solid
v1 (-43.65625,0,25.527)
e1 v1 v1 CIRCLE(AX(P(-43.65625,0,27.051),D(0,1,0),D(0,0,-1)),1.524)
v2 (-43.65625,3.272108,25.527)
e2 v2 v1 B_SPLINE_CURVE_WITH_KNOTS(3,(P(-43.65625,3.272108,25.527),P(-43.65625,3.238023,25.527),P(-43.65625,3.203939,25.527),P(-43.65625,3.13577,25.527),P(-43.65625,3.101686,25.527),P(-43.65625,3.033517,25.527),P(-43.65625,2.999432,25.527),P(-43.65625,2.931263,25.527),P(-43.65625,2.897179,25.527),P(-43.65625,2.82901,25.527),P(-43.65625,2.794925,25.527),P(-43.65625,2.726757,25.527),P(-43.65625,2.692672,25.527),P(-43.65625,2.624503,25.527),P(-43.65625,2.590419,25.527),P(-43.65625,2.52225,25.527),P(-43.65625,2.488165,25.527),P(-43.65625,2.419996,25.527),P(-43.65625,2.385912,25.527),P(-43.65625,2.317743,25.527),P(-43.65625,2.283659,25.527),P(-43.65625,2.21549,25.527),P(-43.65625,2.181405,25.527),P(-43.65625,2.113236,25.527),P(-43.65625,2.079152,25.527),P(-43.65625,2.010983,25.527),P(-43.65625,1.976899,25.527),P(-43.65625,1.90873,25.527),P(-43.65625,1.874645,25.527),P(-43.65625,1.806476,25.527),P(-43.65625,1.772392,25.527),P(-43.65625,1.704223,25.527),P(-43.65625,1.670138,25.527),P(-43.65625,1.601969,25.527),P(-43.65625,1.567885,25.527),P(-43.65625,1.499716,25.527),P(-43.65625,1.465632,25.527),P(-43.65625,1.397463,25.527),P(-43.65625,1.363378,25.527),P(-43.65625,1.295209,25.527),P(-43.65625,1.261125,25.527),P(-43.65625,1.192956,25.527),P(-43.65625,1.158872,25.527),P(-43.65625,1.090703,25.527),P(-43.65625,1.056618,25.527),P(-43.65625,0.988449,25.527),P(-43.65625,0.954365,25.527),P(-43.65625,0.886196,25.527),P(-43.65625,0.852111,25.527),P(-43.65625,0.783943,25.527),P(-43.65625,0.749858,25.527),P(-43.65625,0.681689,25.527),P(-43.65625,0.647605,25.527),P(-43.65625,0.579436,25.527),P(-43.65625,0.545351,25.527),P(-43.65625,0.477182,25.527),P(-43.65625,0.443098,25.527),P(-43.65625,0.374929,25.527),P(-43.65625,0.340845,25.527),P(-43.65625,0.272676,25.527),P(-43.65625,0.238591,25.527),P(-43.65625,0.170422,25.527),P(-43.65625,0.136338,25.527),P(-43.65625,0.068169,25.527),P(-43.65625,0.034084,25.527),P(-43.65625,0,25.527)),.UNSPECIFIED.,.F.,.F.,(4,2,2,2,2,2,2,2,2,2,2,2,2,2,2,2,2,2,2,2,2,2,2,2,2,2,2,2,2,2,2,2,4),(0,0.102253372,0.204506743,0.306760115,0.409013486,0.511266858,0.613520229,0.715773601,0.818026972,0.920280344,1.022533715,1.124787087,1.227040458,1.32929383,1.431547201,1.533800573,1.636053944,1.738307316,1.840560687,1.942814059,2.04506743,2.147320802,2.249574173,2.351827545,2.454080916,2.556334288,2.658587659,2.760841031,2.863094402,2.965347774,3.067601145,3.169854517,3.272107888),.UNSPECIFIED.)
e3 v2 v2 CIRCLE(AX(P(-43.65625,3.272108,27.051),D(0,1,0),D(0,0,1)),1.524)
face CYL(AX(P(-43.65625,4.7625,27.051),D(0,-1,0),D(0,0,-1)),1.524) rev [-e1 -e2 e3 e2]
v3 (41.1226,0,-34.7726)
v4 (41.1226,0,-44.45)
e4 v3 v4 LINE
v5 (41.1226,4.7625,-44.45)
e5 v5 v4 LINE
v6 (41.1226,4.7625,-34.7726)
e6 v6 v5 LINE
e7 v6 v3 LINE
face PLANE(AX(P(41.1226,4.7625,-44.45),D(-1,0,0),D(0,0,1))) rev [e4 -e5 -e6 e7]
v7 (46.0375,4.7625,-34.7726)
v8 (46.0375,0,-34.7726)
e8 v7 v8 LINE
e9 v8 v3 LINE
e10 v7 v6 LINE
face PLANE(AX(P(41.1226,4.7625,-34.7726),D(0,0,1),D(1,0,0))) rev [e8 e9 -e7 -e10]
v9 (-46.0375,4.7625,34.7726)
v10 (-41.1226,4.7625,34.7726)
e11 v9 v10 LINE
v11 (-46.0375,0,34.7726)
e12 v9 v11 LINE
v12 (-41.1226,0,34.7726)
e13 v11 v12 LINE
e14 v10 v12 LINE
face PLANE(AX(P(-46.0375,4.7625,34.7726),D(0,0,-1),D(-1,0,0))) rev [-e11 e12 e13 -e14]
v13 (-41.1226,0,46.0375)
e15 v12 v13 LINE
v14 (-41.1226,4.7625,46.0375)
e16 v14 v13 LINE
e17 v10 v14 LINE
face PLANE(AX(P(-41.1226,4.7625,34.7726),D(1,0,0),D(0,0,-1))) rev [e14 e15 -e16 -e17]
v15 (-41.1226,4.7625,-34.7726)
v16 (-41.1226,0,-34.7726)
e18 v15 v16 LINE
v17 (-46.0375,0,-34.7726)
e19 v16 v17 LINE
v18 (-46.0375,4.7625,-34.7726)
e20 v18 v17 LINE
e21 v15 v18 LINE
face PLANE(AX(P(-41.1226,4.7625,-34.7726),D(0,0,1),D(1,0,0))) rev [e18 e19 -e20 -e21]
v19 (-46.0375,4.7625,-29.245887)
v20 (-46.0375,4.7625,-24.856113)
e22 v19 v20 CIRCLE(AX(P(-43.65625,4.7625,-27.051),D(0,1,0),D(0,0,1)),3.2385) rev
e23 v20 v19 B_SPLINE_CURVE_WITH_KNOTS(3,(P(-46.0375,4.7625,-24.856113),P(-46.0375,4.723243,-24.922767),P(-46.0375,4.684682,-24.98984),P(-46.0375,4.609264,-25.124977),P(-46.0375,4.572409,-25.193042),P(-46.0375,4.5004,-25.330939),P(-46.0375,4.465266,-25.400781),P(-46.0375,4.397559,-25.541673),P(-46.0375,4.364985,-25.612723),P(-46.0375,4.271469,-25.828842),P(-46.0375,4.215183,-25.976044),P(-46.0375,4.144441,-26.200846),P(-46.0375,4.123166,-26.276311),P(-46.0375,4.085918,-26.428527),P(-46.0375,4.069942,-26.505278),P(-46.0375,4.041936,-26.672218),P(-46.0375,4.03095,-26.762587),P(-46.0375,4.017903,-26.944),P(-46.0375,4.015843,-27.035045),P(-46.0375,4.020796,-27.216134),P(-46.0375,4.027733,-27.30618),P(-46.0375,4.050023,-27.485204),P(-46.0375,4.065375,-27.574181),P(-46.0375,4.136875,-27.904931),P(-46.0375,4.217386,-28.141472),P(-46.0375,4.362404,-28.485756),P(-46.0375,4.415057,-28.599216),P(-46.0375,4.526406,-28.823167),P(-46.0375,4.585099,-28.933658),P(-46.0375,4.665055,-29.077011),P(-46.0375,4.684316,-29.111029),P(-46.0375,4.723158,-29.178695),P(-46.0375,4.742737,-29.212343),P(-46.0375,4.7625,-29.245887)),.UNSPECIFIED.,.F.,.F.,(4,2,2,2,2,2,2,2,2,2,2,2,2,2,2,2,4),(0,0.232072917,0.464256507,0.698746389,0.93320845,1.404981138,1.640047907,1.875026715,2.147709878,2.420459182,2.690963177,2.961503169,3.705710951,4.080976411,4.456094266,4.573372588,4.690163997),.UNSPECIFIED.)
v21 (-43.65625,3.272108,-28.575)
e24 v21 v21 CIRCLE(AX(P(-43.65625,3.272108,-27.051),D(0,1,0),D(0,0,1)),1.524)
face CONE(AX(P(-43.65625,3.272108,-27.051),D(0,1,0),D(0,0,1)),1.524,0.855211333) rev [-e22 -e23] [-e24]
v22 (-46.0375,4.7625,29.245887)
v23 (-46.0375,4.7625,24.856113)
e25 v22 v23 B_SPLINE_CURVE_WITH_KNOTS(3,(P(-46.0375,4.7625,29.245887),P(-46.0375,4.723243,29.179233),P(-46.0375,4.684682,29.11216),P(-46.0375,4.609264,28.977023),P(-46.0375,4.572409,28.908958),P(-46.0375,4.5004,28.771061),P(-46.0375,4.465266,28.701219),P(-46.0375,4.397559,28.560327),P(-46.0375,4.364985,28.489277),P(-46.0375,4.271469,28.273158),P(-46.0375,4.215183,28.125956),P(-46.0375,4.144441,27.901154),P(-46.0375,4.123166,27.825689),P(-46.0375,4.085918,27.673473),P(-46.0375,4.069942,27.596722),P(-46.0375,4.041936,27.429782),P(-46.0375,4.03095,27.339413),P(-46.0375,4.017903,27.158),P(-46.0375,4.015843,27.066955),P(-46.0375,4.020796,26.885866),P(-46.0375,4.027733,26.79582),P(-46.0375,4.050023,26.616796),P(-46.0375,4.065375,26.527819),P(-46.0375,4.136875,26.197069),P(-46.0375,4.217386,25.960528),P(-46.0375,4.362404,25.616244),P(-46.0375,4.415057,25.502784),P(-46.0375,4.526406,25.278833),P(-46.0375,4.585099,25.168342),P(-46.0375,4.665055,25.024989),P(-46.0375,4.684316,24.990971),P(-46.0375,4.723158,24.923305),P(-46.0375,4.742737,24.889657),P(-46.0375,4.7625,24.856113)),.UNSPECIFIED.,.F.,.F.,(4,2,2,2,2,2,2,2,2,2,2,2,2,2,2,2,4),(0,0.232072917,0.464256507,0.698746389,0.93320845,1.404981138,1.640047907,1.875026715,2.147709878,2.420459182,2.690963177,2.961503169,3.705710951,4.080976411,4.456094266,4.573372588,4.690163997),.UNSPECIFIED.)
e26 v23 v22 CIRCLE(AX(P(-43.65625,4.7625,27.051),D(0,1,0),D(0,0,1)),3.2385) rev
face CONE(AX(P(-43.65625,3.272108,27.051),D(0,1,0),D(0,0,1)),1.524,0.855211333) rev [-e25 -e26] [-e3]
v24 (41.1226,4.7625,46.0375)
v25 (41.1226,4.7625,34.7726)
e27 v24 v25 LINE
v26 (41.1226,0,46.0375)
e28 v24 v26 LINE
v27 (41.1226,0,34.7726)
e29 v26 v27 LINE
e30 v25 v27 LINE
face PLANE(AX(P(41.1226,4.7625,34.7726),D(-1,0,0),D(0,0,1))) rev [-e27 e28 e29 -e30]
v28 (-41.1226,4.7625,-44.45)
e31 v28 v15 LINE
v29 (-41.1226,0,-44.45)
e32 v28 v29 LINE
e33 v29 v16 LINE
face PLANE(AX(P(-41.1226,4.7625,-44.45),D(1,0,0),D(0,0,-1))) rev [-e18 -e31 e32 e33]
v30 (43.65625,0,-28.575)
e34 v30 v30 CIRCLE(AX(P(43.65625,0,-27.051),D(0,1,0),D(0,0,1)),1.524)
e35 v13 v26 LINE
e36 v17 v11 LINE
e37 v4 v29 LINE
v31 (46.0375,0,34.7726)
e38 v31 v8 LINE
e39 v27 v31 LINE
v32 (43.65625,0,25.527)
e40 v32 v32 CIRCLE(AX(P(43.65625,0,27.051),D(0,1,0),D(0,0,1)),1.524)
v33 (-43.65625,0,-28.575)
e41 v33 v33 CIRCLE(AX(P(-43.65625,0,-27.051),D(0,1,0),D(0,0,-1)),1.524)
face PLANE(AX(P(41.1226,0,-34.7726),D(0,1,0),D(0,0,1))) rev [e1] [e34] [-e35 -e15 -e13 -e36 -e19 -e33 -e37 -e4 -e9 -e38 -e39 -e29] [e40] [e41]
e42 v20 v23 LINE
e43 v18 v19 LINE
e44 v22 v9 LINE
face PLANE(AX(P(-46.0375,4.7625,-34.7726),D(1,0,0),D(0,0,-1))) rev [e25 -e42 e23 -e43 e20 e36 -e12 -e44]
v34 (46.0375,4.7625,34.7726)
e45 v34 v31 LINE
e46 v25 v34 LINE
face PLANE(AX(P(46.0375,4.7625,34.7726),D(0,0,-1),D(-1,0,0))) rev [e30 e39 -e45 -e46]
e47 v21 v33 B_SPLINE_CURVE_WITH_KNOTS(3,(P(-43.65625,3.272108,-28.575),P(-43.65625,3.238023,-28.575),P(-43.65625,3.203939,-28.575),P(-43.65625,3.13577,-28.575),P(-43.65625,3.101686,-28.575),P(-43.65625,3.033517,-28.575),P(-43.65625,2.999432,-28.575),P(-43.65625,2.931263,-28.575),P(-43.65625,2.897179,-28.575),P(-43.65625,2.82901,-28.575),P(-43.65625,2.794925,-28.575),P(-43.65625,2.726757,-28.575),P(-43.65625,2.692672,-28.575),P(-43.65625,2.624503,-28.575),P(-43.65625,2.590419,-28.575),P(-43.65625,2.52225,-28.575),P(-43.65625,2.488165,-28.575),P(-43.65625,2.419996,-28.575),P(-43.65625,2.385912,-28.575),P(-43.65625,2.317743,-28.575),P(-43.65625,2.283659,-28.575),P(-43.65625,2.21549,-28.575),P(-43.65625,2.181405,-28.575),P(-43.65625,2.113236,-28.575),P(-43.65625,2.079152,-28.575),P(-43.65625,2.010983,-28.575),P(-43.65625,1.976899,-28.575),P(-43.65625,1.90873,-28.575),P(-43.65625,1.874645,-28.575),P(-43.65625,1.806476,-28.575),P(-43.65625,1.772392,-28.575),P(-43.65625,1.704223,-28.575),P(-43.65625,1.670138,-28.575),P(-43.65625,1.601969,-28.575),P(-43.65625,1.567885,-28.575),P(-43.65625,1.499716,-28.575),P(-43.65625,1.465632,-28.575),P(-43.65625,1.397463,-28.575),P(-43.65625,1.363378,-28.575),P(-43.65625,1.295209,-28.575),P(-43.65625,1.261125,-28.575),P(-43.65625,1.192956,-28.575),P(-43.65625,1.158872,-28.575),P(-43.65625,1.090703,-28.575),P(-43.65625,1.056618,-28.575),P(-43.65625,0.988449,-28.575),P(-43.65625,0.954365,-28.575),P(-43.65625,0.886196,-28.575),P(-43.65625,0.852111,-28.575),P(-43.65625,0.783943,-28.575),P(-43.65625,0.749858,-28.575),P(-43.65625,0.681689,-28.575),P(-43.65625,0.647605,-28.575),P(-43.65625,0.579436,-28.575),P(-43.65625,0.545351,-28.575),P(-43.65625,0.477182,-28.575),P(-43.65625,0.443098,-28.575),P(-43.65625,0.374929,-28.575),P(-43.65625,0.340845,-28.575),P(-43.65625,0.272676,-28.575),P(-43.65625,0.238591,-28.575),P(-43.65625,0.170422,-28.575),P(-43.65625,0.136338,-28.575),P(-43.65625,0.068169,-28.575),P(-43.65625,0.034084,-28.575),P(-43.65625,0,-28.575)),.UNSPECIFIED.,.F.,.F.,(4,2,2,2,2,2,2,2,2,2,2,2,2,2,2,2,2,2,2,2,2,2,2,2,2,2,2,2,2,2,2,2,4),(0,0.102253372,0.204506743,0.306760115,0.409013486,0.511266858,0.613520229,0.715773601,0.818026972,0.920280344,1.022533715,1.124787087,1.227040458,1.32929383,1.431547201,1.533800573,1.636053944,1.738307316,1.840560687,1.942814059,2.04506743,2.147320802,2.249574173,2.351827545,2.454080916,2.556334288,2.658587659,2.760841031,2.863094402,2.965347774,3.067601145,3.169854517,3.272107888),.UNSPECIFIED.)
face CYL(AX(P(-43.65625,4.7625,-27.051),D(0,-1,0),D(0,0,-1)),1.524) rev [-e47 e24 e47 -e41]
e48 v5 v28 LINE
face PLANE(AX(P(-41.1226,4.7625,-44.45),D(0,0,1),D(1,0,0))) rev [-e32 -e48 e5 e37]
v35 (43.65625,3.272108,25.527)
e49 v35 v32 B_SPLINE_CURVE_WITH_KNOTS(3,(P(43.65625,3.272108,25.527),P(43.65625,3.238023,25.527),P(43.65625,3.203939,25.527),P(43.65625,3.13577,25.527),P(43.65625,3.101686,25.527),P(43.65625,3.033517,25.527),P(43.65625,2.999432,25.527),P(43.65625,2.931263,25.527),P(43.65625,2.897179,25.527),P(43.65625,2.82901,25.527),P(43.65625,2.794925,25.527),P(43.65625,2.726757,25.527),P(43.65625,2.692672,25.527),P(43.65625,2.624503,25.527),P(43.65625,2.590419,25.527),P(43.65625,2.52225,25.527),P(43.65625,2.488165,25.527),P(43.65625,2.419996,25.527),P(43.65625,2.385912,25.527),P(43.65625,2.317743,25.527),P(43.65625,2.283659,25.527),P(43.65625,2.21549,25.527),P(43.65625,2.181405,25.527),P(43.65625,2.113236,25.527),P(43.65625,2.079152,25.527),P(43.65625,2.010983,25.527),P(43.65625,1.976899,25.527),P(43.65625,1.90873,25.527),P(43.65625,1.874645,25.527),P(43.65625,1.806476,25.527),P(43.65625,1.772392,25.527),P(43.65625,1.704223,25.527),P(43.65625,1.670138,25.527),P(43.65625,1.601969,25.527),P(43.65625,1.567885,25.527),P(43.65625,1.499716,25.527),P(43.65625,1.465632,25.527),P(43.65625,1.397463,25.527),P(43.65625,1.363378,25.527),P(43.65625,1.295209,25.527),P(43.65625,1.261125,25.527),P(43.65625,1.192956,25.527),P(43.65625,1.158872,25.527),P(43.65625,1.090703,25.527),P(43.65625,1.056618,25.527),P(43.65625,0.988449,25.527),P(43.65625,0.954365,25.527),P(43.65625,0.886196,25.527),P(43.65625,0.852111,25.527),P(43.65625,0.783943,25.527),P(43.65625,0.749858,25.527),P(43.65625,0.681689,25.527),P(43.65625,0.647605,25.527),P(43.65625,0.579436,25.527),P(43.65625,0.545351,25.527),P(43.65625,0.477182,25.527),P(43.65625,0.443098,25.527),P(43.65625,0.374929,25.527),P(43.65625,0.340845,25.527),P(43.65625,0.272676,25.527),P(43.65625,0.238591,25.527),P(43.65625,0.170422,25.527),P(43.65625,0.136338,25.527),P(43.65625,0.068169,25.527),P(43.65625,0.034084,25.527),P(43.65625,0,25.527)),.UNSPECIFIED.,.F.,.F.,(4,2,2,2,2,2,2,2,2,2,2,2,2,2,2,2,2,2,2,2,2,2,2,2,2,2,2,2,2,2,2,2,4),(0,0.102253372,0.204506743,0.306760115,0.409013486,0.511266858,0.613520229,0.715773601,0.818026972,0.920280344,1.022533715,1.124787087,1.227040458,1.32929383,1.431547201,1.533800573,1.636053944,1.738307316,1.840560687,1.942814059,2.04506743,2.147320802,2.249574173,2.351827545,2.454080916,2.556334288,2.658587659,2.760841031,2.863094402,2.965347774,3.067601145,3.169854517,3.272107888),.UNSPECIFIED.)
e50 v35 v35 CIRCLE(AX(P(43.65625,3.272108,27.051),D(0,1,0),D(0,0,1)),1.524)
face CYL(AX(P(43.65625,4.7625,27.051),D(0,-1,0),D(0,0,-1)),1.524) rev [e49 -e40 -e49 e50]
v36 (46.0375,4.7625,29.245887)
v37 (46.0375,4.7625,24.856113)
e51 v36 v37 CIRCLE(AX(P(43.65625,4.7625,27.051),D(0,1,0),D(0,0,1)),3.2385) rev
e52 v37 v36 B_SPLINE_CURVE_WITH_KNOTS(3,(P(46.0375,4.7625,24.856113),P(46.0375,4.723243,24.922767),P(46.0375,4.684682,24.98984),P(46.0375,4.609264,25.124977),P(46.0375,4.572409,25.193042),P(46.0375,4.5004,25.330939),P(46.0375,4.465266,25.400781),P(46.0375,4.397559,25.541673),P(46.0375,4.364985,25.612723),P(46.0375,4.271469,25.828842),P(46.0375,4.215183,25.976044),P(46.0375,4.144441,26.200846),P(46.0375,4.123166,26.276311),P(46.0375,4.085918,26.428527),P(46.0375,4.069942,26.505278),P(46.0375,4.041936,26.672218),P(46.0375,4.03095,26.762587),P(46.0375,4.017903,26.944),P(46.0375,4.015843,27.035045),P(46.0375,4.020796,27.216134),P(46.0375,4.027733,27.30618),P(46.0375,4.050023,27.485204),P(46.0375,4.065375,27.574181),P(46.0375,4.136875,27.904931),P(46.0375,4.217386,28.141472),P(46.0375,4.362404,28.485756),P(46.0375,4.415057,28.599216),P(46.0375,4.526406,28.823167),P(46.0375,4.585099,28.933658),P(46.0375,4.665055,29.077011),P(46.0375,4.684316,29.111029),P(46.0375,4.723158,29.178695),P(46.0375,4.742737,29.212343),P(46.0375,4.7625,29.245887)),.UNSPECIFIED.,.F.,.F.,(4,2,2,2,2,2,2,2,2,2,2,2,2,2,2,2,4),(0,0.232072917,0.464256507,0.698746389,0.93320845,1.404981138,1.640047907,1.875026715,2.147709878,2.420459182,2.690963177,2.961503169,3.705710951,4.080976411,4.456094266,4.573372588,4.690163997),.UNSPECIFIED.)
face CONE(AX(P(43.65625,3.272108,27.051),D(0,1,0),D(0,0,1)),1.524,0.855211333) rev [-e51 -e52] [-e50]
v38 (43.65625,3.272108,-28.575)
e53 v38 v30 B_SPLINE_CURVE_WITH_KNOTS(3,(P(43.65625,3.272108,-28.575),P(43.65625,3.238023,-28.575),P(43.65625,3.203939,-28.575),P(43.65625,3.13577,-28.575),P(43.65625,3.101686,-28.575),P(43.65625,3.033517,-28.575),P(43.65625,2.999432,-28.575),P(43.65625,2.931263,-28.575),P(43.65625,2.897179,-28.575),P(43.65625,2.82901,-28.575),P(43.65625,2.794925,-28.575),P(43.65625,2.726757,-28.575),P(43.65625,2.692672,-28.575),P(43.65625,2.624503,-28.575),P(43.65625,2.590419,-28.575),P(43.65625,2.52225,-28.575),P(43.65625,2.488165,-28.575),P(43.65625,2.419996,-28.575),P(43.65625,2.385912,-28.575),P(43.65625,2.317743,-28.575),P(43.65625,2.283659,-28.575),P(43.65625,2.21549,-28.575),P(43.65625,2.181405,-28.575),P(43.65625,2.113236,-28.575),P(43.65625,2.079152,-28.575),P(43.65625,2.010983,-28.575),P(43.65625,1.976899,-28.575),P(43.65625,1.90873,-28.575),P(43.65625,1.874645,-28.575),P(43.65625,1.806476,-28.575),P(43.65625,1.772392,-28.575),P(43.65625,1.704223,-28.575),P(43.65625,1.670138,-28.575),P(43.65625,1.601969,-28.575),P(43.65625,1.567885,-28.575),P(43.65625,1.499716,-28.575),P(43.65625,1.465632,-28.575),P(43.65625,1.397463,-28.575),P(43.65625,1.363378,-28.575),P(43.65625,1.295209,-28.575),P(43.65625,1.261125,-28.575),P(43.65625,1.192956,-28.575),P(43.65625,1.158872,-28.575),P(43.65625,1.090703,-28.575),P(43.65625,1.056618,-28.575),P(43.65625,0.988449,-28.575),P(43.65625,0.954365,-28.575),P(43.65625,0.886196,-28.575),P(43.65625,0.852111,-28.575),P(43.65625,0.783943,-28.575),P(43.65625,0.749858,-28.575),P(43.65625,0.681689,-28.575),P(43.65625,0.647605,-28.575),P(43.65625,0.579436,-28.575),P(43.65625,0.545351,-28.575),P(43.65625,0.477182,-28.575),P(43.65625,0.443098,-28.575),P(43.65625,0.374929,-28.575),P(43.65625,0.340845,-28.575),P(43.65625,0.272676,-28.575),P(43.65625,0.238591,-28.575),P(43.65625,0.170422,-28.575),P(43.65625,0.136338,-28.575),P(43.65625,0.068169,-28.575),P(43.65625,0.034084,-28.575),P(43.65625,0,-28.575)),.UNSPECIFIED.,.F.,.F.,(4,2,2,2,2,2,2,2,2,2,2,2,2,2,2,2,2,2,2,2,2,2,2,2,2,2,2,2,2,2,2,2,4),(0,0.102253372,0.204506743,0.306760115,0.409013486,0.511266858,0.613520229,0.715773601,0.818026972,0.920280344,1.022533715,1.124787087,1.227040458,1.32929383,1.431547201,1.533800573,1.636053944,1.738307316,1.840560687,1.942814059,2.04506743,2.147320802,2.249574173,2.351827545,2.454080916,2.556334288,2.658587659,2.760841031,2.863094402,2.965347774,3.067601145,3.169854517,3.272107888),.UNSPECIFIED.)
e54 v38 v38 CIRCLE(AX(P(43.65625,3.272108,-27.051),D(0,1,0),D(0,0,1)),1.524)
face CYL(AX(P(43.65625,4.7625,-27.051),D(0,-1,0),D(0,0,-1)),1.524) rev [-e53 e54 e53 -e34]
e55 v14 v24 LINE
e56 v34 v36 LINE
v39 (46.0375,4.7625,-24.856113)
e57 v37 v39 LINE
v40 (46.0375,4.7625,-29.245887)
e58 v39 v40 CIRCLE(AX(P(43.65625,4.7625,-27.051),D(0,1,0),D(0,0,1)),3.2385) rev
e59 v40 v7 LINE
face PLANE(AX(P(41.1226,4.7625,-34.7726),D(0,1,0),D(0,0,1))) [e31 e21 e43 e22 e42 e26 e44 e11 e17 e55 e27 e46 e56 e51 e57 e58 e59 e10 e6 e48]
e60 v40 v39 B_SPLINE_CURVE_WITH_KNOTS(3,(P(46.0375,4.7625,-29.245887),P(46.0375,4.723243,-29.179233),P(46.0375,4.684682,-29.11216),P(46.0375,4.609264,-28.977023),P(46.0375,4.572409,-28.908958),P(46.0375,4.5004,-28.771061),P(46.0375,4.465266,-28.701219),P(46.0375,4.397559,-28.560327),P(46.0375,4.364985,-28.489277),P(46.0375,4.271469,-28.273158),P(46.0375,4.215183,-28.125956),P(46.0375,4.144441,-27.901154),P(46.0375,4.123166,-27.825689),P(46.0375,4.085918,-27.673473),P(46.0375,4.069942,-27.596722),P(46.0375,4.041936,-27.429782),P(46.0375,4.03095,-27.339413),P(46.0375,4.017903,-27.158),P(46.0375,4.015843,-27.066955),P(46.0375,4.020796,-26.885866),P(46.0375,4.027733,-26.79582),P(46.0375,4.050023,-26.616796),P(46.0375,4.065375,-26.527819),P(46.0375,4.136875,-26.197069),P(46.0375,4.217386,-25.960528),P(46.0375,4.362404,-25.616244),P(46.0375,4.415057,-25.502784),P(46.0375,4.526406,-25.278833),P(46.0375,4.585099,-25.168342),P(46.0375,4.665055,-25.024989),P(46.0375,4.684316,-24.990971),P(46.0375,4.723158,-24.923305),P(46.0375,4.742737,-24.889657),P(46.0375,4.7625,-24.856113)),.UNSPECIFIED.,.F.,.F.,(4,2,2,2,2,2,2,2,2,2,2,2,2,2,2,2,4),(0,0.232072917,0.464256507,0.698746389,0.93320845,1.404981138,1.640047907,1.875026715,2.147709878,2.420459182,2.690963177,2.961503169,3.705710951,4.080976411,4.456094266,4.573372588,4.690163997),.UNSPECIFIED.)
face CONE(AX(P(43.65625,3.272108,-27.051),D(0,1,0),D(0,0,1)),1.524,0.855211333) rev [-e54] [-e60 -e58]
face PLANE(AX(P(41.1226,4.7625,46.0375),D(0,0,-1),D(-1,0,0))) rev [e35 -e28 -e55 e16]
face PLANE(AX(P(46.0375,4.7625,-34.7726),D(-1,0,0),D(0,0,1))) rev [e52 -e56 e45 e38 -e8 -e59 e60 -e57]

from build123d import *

# Parameters (mm, degrees)
SKETCH1_R           = 1.524
BOSS_EXTRUDE1_DEPTH = 4.7625
CHAMFER1_SIZE       = 1.490392112
CHAMFER1_SIZE_2     = 1.7145


with BuildPart() as part:
    # Sketch1 → Boss-Extrude1 (new body)
    with BuildSketch(Plane(origin=(0, 0, 0), x_dir=(1, 0, 0), z_dir=(0, 1, 0))):
        Polygon((-41.1226, 44.45), (41.1226, 44.45), (41.1226, 34.7726), (46.0375, 34.7726), (46.0375, -34.7726), (41.1226, -34.7726), (41.1226, -46.0375), (-41.1226, -46.0375), (-41.1226, -34.7726), (-46.0375, -34.7726), (-46.0375, 34.7726), (-41.1226, 34.7726), align=None)
        with Locations(Location((43.65625, 27.051, 0), (0, 0, 90))):
            Circle(SKETCH1_R, mode=Mode.SUBTRACT)
        with Locations(Location((43.65625, -27.051, 0), (0, 0, 90))):
            Circle(SKETCH1_R, mode=Mode.SUBTRACT)
        with Locations(Location((-43.65625, -27.051, 0), (0, 0, 90))):
            Circle(SKETCH1_R, mode=Mode.SUBTRACT)
        with Locations(Location((-43.65625, 27.051, 0), (0, 0, 90))):
            Circle(SKETCH1_R, mode=Mode.SUBTRACT)
    extrude(amount=BOSS_EXTRUDE1_DEPTH)

    # Chamfer1
    # the kernel refuses this chamfer: 1.7145, 1.490392112 mm, written as the material it takes off along each edge
    with BuildSketch(Plane(origin=(43.65625, 4.7625, -27.051), x_dir=(0, 0, -1), z_dir=(1, 0, 0))) as chamfer1_piece_1:
        Polygon((1.524, -CHAMFER1_SIZE), (1.524 + CHAMFER1_SIZE_2, 0), (1.524, 0), align=None)
    revolve(axis=Axis((43.65625, 4.7625, -27.051), (0, 1, 0)), mode=Mode.SUBTRACT)
    with BuildSketch(Plane(origin=(43.65625, 4.7625, 27.051), x_dir=(0, 0, -1), z_dir=(1, 0, 0))) as chamfer1_piece_2:
        Polygon((1.524, -CHAMFER1_SIZE), (1.524 + CHAMFER1_SIZE_2, 0), (1.524, 0), align=None)
    revolve(axis=Axis((43.65625, 4.7625, 27.051), (0, 1, 0)), mode=Mode.SUBTRACT)
    with BuildSketch(Plane(origin=(-43.65625, 4.7625, 27.051), x_dir=(0, 0, -1), z_dir=(1, 0, 0))) as chamfer1_piece_3:
        Polygon((1.524, -CHAMFER1_SIZE), (1.524 + CHAMFER1_SIZE_2, 0), (1.524, 0), align=None)
    revolve(axis=Axis((-43.65625, 4.7625, 27.051), (0, 1, 0)), mode=Mode.SUBTRACT)
    with BuildSketch(Plane(origin=(-43.65625, 4.7625, -27.051), x_dir=(0, 0, -1), z_dir=(1, 0, 0))) as chamfer1_piece_4:
        Polygon((1.524, -CHAMFER1_SIZE), (1.524 + CHAMFER1_SIZE_2, 0), (1.524, 0), align=None)
    revolve(axis=Axis((-43.65625, 4.7625, -27.051), (0, 1, 0)), mode=Mode.SUBTRACT)


solid = part.part
